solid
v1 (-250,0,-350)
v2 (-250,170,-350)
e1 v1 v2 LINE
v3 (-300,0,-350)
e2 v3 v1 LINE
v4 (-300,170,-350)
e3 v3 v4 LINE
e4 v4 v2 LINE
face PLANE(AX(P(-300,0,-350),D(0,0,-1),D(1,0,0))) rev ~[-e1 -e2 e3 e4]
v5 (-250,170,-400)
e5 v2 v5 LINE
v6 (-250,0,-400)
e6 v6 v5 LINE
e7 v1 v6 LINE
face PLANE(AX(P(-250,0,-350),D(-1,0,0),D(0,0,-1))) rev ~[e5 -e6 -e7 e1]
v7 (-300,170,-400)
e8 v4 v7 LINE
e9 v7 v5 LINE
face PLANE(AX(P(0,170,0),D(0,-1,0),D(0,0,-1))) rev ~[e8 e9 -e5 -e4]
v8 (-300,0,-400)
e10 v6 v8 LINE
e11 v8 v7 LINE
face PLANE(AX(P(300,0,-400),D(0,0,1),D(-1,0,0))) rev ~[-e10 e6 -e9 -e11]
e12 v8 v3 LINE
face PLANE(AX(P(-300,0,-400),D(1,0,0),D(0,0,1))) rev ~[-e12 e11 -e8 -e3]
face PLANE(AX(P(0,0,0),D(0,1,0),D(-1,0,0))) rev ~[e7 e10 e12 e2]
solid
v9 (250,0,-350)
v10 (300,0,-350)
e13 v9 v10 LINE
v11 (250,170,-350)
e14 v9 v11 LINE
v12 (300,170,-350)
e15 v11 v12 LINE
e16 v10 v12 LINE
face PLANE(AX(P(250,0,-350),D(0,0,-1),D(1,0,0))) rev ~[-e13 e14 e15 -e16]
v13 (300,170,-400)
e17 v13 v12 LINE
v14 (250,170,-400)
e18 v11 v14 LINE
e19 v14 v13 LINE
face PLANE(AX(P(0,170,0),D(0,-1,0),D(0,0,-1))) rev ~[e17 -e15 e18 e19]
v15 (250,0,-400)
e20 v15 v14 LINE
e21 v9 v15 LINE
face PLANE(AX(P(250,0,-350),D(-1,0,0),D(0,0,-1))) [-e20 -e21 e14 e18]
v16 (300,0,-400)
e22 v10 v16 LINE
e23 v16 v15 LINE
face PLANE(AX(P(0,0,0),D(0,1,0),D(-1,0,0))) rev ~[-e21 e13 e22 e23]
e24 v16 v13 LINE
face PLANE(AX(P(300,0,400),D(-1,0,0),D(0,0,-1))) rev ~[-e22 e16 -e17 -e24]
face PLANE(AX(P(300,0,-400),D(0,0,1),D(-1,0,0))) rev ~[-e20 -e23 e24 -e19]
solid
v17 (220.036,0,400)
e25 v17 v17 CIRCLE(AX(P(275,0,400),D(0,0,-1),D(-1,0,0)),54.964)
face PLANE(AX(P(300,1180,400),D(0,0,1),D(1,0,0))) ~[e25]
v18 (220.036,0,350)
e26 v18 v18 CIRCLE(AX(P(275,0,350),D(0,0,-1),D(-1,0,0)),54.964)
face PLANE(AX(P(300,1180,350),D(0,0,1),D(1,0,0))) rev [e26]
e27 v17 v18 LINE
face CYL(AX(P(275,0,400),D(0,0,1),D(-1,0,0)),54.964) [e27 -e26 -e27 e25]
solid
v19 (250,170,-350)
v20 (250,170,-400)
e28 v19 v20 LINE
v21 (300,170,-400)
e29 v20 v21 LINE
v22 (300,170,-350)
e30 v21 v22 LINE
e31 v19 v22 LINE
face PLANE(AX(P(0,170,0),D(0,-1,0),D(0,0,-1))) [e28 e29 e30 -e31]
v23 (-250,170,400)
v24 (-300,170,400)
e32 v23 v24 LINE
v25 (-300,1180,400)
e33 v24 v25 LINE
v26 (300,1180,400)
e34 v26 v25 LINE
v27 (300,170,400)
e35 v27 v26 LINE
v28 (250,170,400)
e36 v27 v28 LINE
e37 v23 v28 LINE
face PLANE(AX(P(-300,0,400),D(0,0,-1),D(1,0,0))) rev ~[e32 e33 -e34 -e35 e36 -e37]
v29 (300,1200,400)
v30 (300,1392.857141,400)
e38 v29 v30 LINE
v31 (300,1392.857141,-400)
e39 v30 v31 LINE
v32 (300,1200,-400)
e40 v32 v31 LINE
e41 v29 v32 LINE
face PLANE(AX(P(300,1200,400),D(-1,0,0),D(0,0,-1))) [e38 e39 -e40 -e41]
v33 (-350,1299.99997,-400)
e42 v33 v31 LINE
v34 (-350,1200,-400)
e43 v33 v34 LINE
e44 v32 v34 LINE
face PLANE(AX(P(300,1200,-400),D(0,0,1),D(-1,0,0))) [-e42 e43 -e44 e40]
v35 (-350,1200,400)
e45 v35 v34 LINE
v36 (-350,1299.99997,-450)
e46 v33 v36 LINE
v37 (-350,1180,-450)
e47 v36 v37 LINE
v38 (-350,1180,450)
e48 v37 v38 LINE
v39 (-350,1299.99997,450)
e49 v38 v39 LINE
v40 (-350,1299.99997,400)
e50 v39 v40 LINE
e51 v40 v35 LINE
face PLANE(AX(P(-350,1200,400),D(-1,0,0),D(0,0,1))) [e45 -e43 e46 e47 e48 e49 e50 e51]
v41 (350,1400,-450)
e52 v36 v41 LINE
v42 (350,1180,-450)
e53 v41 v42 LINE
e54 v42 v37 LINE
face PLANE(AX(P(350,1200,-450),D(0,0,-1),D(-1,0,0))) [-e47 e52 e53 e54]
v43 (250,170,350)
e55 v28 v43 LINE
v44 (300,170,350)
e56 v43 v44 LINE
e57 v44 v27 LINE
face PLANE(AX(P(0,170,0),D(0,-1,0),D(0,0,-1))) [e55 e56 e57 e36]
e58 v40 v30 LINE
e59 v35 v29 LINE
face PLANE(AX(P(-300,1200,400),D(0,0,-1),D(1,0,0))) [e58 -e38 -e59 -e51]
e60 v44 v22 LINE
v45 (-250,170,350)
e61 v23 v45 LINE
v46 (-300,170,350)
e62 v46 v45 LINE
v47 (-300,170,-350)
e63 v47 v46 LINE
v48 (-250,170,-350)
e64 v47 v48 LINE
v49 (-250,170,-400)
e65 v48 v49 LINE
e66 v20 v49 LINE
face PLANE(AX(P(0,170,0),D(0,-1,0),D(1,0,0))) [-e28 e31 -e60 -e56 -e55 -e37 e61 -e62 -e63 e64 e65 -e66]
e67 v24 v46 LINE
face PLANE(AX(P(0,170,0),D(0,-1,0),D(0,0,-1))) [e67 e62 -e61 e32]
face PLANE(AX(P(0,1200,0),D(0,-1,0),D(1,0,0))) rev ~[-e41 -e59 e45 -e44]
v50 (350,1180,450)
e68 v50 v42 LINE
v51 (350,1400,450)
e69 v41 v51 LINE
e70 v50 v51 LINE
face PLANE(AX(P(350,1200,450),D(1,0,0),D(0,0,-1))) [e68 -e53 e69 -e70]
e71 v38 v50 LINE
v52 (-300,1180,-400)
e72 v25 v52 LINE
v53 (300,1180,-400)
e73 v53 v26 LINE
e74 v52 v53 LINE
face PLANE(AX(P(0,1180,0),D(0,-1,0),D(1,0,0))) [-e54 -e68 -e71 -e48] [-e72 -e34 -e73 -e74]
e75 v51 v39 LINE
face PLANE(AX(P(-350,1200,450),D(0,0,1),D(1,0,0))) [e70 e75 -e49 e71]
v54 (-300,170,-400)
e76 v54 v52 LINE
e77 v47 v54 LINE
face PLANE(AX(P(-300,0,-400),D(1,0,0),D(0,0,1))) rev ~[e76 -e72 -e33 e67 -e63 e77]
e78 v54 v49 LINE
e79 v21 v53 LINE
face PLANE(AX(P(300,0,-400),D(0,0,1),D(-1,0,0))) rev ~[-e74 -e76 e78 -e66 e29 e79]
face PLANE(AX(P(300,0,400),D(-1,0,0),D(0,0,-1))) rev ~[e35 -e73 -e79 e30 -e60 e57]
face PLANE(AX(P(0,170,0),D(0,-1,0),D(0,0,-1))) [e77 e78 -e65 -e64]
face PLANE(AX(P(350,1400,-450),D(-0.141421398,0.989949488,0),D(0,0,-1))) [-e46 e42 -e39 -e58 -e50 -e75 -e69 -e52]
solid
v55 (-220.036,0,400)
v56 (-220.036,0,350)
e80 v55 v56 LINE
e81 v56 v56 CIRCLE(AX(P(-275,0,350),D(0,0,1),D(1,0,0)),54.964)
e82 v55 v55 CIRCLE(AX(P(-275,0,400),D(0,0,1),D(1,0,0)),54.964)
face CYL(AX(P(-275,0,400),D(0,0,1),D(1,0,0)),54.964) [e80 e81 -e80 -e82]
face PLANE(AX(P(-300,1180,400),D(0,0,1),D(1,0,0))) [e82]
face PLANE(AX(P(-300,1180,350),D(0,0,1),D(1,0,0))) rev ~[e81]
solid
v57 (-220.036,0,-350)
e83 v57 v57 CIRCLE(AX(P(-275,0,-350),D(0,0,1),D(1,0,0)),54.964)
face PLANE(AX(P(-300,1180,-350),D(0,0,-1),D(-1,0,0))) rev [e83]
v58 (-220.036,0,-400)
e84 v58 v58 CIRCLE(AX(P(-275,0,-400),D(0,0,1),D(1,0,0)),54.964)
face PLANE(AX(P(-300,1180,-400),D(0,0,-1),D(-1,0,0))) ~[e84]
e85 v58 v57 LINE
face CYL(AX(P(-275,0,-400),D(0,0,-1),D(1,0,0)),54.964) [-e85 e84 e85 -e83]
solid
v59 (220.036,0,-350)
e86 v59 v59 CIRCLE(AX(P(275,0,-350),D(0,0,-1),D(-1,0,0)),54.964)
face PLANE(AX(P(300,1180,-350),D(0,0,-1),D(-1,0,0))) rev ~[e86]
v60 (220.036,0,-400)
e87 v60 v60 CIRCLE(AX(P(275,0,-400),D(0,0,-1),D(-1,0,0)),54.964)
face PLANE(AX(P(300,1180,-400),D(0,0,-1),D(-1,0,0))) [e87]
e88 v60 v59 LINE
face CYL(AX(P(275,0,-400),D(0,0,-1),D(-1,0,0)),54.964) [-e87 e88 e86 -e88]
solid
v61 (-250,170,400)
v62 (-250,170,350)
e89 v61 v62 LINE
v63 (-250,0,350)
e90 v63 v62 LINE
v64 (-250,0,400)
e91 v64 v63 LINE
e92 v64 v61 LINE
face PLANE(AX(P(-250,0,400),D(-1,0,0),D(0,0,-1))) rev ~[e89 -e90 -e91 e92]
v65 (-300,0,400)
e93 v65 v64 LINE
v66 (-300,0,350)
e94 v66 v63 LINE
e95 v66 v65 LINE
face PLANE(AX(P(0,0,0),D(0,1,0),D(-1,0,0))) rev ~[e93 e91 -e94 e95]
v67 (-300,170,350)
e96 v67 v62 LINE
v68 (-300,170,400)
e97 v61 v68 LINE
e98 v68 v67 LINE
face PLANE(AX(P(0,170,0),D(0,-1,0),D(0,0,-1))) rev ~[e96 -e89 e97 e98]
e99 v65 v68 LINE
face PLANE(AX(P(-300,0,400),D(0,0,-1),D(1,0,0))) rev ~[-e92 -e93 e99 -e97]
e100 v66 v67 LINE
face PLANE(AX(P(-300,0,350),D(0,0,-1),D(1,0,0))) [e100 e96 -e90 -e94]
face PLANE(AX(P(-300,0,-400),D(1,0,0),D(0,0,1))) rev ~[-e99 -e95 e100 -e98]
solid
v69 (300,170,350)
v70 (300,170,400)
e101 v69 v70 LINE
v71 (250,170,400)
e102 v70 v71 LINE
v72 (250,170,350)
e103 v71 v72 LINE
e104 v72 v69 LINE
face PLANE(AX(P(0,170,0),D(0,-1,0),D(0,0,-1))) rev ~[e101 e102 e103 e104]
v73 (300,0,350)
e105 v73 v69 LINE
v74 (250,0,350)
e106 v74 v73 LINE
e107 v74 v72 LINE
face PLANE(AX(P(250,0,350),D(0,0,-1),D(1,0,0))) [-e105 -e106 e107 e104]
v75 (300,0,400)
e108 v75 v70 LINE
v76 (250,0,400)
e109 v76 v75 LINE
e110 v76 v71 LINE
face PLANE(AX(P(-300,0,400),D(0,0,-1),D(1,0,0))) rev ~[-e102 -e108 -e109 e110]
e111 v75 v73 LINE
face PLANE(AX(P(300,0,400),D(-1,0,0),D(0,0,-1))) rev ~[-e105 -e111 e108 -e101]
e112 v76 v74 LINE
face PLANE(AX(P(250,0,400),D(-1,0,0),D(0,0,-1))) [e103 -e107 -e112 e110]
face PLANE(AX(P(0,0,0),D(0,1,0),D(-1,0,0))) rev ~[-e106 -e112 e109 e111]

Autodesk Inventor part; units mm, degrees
ref_plane "YZ Plane" through (0, 0, 0) normal (1, 0, 0) x (0, 1, 0)
sketch "草圖1" plane through (0, 0, 0) normal (0, 1, 0) x (-1, 0, 0)
  line L0 (300, 400) -> (-300, 400)
  line L1 (-300, 400) -> (-300, -400)
  line L2 (-300, -400) -> (300, -400)
  line L3 (300, -400) -> (300, 400)
  line L4 (300, 400) -> (-300, -400) construction
  line L5 (-300, 400) -> (300, -400) construction
  point P0 (0, 0)
  dimension "d0" = 600
  dimension "d1" = 800
extrude "擠出1" add sketch "草圖1" along normal blind 1200
sketch "草圖2" plane through (0, 1200, 0) normal (0, 1, 0) x (1, 0, 0)
  line L0 (-300, -400) -> (300, -400) projected
  line L1 (300, -400) -> (300, 400) projected
  line L2 (300, 400) -> (-300, 400) projected
  line L3 (-300, 400) -> (-300, -400) projected
  line L4 (350, 450) -> (350, -450)
  line L5 (350, -450) -> (-350, -450)
  line L6 (-350, -450) -> (-350, 450)
  line L7 (-350, 450) -> (350, 450)
  point P0 (0, 0)
  dimension "d4" = 50
extrude "擠出2" add sketch "草圖2" along normal blind 200
ref_plane "工作平面1" through (350, 1400, -450) normal (0.1414214, -0.9899495, 0) x (0, 0, 1)
split "分割1" plane through (350, 1400, -450) removes the side toward (-0.1414214, 0.9899495, 0)
sketch "草圖3" plane through (-300, 1200, 400) normal (1, 0, 0) x (0, 0, -1)
  line L0 (800, 107.1429) -> (0, 107.1429) projected
  line L1 (0, 0) -> (0, 107.1429) projected
  line L2 (800, 0) -> (0, 0) projected
  line L3 (800, 0) -> (800, 107.1429) projected
  point P0 (400, -1200)
extrude "擠出3" cut sketch "草圖3" against normal through all
sketch "草圖4" plane through (0, 1200, 0) normal (0, -1, 0) x (1, 0, 0)
  line L0 (-350, 400) -> (-300, 400) projected
  line L1 (-300, 400) -> (300, 400) projected
  line L2 (300, 400) -> (300, -400) projected
  line L3 (300, -400) -> (-300, -400) projected
  line L4 (-300, -400) -> (-350, -400) projected
  line L5 (-350, -450) -> (-350, -400) projected
  line L6 (350, -450) -> (-350, -450) projected
  line L7 (350, 450) -> (350, -450) projected
  line L8 (-350, 450) -> (350, 450) projected
  line L9 (-350, 400) -> (-350, 450) projected
  line L10 (-350, -450) -> (-350, -400) projected
  line L11 (-350, 400) -> (-300, 400) projected
  line L12 (-350, -400) -> (-350, 400)
  point P0 (0, 0)
extrude "擠出4" add sketch "草圖4" along normal blind 20
sketch "草圖5" plane through (0, 0, 0) normal (0, -1, 0) x (1, 0, 0)
  line L0 (-300, 400) -> (300, 400) projected
  line L1 (-300, -400) -> (-300, 400) projected
  line L2 (300, -400) -> (-300, -400) projected
  line L3 (300, 400) -> (300, -400) projected
  line L4 (-300, -400) -> (-300, 400) projected
  line L5 (-300, 350) -> (300, 350)
  line L6 (-300, -350) -> (300, -350)
  line L7 (300, 400) -> (300, -400) projected
  line L8 (-300, 400) -> (300, 400) projected
  line L9 (-250, 400) -> (-250, -400)
  line L10 (300, -400) -> (-300, -400) projected
  line L11 (250, 400) -> (250, -400)
  point P0 (0, 0)
  point P1 (-250, -350)
  point P2 (250, -350)
  point P3 (250, 350)
  point P4 (-250, 350)
  dimension "d11" = 50
  dimension "d12" = 50
  dimension "d13" = 50
  dimension "d14" = 50
extrude "擠出5" cut sketch "草圖5" against normal blind 170 contours L0 L11 L5 L9 | L5 L9 L6 L1 | L5 L11 L6 L9 | L5 L3 L6 L11 | L6 L11 L2 L9
sketch "草圖6" plane through (-300, 1180, 400) normal (0, 0, 1) x (1, 0, 0)
  line L0 (50, -1180) -> (0, -1180) projected
  circle A0 centre (25, -1180) radius 54.964
  point P0 (300, -1180)
extrude "擠出6" add sketch "草圖6" against normal up to surface (50 mm away) separate body
mirror "鏡射1" about plane through (0, 0, 0) normal (1, 0, 0) bodies 2
mirror "鏡射2" about plane through (0, 0, 0) normal (0, 0, 1) bodies 2
ref_plane "工作平面2" through (0, 170, 0) normal (0, -1, 0) x (1, 0, 0)
split body "分割2" result two bodies by plane through (0, 170, 0) normal (0, -1, 0) bodies 1 first body at (-283.3333, 56.6667, -350.5) (-299.5, 113.3333, 366.6667) (283.3333, 56.6667, 350.5) (299.5, 113.3333, -366.6667)
equation "\"d12\" = d11"
equation "\"d13\" = d12"
equation "\"d14\" = d12"
properties part number "傳統主席台"
